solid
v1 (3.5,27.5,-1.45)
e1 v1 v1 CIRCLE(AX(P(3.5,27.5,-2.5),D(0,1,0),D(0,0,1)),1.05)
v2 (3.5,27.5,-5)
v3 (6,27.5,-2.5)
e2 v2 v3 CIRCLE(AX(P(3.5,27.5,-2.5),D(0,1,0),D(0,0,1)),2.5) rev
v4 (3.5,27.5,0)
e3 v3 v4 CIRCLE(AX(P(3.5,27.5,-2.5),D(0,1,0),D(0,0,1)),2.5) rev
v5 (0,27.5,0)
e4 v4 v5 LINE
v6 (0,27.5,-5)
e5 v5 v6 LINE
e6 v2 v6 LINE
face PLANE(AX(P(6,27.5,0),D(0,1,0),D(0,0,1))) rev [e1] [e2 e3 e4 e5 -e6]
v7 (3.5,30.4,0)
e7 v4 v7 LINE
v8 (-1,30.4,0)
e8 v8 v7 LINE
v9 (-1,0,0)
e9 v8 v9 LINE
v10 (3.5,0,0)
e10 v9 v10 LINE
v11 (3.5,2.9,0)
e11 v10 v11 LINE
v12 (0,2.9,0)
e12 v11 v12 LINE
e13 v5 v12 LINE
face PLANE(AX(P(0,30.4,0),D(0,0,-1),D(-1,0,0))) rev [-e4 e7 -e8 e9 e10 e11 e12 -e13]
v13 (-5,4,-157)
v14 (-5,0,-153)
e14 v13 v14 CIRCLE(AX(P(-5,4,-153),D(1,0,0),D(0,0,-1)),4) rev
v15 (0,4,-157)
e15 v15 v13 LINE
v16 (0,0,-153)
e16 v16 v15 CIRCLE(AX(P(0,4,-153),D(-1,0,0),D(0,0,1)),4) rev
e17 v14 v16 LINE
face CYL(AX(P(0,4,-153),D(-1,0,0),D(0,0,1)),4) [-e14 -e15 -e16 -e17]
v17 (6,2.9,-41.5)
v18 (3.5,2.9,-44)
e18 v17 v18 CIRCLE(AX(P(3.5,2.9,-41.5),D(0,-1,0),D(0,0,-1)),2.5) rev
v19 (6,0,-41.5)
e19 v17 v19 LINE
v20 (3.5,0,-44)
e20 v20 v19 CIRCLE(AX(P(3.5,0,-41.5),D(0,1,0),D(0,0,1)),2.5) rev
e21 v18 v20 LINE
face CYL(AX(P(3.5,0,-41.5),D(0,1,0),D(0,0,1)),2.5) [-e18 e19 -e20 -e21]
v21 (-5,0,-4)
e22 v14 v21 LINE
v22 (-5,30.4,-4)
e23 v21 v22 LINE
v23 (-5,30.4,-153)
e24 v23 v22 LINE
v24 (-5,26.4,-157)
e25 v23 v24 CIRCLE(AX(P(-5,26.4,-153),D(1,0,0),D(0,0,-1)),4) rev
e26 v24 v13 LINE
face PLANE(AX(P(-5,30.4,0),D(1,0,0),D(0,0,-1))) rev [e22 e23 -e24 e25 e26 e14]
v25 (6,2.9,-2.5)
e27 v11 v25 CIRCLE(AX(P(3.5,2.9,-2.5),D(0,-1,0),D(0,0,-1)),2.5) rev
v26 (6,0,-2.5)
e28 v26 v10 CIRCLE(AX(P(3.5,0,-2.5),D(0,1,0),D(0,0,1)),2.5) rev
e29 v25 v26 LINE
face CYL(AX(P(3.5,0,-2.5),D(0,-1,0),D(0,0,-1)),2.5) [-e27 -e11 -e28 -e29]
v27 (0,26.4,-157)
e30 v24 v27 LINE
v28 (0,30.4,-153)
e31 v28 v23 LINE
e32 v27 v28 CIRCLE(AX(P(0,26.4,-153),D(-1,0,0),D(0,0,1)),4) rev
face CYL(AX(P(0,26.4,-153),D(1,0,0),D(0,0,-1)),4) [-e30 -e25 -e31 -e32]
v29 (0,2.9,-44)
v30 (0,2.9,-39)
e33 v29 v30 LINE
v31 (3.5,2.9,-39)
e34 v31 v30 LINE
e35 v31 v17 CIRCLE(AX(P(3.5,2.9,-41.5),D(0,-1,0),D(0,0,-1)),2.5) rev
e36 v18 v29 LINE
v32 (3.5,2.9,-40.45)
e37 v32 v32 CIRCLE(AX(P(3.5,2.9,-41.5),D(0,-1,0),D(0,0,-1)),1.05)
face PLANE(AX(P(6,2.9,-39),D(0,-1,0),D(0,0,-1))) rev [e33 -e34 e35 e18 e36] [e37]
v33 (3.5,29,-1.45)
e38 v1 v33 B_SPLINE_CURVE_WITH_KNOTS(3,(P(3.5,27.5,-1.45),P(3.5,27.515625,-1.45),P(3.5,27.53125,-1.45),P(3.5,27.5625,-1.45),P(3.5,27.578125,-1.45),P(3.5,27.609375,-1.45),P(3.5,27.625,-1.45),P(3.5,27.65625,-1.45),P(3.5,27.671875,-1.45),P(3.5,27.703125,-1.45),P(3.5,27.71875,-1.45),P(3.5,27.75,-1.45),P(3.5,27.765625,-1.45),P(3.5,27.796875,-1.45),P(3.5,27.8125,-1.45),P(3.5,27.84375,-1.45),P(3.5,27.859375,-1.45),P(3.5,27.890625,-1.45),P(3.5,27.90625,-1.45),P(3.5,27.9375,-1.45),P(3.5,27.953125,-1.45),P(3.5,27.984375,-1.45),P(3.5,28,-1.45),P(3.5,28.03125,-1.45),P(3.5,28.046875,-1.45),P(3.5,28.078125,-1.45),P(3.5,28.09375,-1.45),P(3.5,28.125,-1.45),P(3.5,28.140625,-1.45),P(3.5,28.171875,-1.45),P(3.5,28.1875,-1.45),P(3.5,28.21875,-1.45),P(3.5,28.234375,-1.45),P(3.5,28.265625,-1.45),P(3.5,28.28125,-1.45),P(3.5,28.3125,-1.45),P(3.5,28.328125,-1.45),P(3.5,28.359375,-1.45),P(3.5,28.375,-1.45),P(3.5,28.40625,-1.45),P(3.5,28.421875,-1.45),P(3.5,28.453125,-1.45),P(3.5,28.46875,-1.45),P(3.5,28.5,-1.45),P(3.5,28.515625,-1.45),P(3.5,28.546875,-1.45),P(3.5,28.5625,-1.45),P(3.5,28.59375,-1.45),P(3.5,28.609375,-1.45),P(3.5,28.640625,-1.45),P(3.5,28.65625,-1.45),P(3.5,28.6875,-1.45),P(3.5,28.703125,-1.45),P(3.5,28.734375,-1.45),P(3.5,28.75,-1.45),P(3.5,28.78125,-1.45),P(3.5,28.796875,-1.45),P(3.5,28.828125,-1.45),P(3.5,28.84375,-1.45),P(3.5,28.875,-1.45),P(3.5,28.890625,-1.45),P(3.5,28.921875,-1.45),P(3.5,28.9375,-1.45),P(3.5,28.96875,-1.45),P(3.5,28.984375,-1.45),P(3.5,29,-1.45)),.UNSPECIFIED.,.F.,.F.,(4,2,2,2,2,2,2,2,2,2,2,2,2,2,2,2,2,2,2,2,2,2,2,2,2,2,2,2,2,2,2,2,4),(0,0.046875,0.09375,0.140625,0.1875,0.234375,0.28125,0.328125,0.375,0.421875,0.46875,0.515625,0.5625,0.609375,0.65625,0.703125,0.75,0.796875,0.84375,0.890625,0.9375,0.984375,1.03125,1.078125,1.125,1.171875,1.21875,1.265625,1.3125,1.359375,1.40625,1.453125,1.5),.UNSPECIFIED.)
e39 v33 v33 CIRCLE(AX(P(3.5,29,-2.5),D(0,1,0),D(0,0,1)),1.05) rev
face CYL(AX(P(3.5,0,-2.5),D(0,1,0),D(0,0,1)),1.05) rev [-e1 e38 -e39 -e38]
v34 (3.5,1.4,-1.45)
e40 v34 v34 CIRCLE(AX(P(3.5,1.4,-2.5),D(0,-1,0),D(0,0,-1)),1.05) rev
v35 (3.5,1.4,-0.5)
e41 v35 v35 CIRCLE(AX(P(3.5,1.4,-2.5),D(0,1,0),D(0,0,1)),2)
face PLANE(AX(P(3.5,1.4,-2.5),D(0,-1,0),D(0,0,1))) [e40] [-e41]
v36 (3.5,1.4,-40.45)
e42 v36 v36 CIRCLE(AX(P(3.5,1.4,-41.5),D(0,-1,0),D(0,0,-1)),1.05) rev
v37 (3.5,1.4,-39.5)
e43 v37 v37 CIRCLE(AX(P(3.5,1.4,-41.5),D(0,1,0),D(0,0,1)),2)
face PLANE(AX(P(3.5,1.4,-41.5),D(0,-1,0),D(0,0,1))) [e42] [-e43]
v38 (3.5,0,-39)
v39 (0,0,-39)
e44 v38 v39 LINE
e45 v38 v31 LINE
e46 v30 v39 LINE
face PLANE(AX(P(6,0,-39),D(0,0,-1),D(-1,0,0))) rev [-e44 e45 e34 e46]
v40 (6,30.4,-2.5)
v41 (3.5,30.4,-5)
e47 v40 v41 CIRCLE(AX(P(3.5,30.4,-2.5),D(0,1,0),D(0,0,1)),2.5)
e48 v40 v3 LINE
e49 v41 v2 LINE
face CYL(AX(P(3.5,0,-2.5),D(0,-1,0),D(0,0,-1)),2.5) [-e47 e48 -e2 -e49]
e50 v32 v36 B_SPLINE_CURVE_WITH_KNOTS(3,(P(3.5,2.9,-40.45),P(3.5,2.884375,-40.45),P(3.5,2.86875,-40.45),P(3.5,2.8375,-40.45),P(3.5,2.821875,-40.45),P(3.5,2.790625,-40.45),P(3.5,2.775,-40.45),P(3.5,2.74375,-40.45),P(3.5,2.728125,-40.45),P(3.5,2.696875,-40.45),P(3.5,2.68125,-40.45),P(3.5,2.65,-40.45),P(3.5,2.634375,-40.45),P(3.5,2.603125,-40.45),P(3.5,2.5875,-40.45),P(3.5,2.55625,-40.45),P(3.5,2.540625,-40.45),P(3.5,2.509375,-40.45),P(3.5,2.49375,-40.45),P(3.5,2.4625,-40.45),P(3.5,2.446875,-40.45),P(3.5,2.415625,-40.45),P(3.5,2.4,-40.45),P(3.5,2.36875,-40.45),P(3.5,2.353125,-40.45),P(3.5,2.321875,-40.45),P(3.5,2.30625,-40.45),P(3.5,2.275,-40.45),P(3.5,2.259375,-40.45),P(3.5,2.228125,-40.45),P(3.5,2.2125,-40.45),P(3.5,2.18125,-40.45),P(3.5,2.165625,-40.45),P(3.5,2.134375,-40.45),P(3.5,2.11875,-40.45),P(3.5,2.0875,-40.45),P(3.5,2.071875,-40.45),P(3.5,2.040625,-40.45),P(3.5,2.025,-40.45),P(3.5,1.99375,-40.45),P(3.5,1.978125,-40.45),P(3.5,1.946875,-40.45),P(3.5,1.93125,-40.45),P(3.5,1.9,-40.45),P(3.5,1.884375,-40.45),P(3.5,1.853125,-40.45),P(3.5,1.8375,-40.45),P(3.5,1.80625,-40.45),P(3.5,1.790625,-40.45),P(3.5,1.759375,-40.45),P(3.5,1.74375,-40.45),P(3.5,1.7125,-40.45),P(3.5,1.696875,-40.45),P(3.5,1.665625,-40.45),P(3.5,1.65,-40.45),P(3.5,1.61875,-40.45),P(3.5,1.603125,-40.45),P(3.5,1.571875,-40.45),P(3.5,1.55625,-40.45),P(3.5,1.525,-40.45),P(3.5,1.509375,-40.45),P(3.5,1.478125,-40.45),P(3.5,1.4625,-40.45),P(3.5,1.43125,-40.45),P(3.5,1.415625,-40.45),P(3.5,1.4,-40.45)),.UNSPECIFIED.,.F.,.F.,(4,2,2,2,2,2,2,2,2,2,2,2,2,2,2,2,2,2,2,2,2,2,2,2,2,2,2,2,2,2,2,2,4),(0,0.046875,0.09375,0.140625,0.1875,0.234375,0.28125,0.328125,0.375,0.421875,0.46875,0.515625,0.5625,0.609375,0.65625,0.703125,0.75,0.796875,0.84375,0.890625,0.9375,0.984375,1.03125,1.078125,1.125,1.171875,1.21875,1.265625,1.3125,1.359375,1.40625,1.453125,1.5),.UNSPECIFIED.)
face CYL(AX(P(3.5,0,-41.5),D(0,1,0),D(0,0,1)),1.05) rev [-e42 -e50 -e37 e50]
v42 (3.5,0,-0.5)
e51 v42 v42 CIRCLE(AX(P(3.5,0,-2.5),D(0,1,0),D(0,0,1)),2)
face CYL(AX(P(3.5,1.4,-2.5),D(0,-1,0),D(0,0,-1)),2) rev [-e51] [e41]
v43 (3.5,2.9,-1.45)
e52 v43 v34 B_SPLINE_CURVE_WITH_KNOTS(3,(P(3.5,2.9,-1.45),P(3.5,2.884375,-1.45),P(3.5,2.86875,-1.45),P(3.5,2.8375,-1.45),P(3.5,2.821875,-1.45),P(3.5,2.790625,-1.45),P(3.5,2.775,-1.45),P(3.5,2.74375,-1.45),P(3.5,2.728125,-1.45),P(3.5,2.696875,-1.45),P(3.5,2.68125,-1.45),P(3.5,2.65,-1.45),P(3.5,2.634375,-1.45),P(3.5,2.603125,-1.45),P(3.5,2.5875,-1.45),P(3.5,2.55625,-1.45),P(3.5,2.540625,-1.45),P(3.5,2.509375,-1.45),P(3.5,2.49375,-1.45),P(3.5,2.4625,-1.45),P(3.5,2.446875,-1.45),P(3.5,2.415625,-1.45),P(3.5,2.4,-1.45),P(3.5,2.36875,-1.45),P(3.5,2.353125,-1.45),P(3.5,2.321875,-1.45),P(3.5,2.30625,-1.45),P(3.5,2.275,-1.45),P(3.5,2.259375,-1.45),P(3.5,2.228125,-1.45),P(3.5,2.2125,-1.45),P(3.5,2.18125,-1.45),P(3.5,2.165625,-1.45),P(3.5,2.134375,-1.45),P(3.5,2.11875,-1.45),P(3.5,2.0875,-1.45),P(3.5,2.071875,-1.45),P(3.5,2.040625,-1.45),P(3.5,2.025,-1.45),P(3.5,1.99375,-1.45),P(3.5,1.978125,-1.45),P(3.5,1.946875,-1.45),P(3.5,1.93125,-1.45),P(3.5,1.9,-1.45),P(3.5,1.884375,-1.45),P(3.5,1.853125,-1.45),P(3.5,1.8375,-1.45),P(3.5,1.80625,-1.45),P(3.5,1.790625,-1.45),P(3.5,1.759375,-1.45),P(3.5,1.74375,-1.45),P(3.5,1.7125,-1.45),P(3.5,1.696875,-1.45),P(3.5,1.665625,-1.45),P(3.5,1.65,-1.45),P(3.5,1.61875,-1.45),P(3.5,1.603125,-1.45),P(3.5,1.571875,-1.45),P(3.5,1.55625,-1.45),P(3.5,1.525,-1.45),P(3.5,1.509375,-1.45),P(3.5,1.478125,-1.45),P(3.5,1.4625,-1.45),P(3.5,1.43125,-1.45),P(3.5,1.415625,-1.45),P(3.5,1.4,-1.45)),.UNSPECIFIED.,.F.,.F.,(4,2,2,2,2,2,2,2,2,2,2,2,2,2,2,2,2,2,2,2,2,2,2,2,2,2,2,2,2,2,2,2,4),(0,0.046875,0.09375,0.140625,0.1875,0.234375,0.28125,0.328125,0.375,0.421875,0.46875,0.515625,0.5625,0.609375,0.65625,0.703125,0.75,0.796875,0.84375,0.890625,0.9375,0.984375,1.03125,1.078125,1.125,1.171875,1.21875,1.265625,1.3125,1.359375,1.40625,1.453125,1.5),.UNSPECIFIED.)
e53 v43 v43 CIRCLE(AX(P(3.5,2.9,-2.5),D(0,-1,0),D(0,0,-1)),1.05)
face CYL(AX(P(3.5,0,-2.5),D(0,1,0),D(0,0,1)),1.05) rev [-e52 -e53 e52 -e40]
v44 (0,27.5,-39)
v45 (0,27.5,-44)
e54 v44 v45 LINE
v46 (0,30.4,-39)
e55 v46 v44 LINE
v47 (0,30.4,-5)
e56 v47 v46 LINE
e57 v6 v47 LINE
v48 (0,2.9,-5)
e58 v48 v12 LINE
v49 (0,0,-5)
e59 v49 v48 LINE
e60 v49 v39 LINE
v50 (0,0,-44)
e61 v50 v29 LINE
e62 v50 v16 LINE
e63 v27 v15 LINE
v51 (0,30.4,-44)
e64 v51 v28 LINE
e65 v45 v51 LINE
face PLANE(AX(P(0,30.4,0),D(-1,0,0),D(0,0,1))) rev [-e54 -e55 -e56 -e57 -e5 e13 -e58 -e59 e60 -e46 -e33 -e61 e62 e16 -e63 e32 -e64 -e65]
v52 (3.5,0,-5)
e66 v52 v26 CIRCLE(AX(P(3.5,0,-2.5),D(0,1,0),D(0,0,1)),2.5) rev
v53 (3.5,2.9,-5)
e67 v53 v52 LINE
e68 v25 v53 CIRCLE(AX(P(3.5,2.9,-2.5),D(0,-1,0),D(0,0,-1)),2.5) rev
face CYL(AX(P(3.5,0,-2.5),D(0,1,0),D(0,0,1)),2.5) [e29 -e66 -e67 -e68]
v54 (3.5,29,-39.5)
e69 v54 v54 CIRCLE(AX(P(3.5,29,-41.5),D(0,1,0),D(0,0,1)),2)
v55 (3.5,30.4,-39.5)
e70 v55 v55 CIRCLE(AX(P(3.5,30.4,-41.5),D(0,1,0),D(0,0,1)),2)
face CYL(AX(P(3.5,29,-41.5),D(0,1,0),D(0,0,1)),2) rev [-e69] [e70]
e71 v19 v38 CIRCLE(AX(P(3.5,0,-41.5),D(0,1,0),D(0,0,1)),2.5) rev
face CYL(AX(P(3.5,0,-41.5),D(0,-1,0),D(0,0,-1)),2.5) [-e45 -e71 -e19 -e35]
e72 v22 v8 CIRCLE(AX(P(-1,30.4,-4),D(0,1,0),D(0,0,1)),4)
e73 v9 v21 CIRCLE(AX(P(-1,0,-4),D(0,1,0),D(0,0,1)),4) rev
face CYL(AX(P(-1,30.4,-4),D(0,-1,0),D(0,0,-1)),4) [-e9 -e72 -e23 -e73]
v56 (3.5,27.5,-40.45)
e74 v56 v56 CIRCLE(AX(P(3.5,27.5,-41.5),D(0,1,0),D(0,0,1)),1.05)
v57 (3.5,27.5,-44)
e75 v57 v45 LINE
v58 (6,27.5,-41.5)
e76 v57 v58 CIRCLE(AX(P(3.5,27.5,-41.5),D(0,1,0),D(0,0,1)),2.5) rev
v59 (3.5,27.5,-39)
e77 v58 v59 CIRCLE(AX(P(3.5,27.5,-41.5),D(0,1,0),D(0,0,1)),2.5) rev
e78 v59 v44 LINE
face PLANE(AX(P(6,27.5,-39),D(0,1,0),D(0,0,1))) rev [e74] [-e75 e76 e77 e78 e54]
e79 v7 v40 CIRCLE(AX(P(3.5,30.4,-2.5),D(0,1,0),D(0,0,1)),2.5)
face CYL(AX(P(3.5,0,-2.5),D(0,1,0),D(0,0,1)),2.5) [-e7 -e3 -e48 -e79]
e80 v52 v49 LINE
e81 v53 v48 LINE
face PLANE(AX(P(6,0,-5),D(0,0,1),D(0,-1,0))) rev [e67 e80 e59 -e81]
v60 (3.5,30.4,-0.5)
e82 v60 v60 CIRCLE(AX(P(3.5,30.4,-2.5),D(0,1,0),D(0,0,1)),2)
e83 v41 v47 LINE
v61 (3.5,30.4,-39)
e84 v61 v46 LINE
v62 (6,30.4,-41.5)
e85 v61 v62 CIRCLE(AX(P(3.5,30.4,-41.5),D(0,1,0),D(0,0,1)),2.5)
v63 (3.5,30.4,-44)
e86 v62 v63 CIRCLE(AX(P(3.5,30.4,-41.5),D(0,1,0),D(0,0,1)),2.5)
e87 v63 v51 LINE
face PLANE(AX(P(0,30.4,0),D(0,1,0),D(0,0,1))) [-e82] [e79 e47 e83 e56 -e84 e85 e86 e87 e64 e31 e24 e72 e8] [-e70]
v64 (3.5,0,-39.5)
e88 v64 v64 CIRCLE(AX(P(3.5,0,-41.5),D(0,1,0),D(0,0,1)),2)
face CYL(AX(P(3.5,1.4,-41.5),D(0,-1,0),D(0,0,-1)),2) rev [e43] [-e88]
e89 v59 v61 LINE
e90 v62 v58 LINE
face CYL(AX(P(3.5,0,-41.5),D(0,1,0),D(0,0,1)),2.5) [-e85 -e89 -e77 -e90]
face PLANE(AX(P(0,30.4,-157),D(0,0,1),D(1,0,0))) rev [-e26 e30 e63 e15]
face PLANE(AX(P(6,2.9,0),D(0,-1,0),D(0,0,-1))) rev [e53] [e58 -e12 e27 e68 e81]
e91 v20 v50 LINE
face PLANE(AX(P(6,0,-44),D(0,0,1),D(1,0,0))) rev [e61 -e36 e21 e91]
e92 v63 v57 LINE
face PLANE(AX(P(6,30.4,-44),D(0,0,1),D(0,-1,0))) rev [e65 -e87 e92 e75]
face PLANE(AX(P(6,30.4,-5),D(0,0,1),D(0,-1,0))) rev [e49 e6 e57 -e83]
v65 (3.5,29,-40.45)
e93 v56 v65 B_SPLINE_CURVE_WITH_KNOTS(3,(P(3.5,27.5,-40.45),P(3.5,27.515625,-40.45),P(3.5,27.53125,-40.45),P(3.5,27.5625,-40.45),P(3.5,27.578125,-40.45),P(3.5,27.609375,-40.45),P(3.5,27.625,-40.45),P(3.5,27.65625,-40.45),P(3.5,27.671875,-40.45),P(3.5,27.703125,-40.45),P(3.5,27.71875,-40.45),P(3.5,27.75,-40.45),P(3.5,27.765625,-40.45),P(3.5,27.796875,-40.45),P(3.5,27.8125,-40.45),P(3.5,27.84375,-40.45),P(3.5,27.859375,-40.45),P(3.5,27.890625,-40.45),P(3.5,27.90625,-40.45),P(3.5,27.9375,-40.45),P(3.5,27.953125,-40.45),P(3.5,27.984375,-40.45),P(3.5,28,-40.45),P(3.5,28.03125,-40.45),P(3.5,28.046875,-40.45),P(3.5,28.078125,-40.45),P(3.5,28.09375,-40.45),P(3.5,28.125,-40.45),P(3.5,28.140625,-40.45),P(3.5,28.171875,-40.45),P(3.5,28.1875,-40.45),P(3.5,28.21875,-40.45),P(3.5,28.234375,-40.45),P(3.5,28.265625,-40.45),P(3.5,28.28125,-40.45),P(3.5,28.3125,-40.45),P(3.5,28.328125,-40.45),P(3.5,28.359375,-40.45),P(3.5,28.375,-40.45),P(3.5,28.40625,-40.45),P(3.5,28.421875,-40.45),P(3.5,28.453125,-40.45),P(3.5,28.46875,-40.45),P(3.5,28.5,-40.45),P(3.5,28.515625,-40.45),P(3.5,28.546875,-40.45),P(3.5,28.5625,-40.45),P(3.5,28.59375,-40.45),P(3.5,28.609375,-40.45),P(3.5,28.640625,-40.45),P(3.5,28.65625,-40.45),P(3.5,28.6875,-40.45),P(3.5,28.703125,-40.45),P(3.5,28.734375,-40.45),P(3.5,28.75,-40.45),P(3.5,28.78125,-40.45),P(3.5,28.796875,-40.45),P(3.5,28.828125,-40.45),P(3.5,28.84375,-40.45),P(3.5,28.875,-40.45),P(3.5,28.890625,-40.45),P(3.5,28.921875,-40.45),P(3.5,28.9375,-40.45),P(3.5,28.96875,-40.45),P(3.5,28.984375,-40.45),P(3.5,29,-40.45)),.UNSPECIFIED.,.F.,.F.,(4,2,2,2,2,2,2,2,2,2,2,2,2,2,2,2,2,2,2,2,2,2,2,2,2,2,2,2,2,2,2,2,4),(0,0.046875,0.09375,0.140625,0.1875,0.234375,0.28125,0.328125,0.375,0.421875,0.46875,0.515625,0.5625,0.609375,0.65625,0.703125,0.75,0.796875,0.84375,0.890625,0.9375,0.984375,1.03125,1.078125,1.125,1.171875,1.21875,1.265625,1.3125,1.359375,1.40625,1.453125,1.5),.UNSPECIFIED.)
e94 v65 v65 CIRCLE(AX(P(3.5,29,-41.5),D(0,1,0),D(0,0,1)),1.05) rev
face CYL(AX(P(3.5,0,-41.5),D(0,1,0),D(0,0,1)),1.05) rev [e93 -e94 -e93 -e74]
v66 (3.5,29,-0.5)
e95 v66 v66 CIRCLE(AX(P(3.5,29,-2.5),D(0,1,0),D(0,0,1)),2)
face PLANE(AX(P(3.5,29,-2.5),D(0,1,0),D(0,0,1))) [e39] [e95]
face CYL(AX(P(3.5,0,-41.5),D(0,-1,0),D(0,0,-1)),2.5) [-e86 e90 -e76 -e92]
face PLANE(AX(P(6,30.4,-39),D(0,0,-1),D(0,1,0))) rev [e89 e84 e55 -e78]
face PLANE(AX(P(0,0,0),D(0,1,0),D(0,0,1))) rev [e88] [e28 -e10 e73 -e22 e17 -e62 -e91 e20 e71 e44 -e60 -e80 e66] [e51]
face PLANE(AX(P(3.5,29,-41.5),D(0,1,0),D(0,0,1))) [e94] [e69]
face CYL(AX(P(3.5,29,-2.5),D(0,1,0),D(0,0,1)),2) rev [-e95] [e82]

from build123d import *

# Parameters (mm, degrees)
SKETCH1_W           = 5
SKETCH1_H           = 157
BOSS_EXTRUDE1_DEPTH = 30.4
SKETCH2_W           = 5
SKETCH2_H           = 2.9
BOSS_EXTRUDE2_DEPTH = 6
SKETCH3_R           = 1.05
CUT_EXTRUDE1_DEPTH  = 161.02862244
SKETCH4_R           = 2
CUT_EXTRUDE2_DEPTH  = 1.4
FILLET1_R           = 4
FILLET2_R           = 2.5


with BuildPart() as part:
    # Sketch1 → Boss-Extrude1 (new body)
    with BuildSketch(Plane(origin=(0, 0, 0), x_dir=(1, 0, 0), z_dir=(0, 1, 0))):
        with Locations((-2.5, 78.5)):
            Rectangle(SKETCH1_W, SKETCH1_H)
    extrude(amount=BOSS_EXTRUDE1_DEPTH)

    # Sketch2 → Boss-Extrude2 (add)
    with BuildSketch(Plane(origin=(0, 0, 0), x_dir=(0, 0, -1), z_dir=(1, 0, 0))):
        with Locations((2.5, 28.95)):
            Rectangle(SKETCH2_W, SKETCH2_H)
        with Locations((41.5, 28.95)):
            Rectangle(SKETCH2_W, SKETCH2_H)
        with Locations((41.5, 1.45)):
            Rectangle(SKETCH2_W, SKETCH2_H)
        with Locations((2.5, 1.45)):
            Rectangle(SKETCH2_W, SKETCH2_H)
    extrude(amount=BOSS_EXTRUDE2_DEPTH)

    # Sketch3 → Cut-Extrude1 (cut, through all)
    with BuildSketch(Plane(origin=(0, 30.4, 0), x_dir=(1, 0, 0), z_dir=(0, 1, 0))):
        with Locations(Location((3.5, 41.5, 0), (0, 0, 270))):
            Circle(SKETCH3_R)
        with Locations(Location((3.5, 2.5, 0), (0, 0, 270))):
            Circle(SKETCH3_R)
    extrude(amount=-CUT_EXTRUDE1_DEPTH, mode=Mode.SUBTRACT)

    # Sketch4 → Cut-Extrude2 (cut)
    with BuildSketch(Plane(origin=(0, 30.4, 0), x_dir=(1, 0, 0), z_dir=(0, 1, 0))):
        with Locations(Location((3.5, 41.5, 0), (0, 0, 270))):
            Circle(SKETCH4_R)
        with Locations(Location((3.5, 2.5, 0), (0, 0, 270))):
            Circle(SKETCH4_R)
    cut_extrude2 = extrude(amount=-CUT_EXTRUDE2_DEPTH, mode=Mode.SUBTRACT)

    # Mirror2: Cut-Extrude2 across plane
    add(cut_extrude2.mirror(Plane.ZX.offset(15.2)), mode=Mode.SUBTRACT)

    # Fillet1
    fillet1_edges = [part.edges().sort_by_distance(p)[0] for p in [
        (-2.5, 0, -157),
        (-5, 15.2, 0),
        (-2.5, 30.4, -157),
    ]]
    fillet(fillet1_edges, radius=FILLET1_R)

    # Fillet2
    fillet2_edges = [part.edges().sort_by_distance(p)[0] for p in [
        (6, 1.45, -5),
        (6, 1.45, 0),
        (6, 1.45, -44),
        (6, 1.45, -39),
        (6, 28.95, -44),
        (6, 28.95, -39),
        (6, 28.95, -5),
        (6, 28.95, 0),
    ]]
    fillet(fillet2_edges, radius=FILLET2_R - 0.0001)  # a hair under: the kernel refuses the full size


solid = part.part
